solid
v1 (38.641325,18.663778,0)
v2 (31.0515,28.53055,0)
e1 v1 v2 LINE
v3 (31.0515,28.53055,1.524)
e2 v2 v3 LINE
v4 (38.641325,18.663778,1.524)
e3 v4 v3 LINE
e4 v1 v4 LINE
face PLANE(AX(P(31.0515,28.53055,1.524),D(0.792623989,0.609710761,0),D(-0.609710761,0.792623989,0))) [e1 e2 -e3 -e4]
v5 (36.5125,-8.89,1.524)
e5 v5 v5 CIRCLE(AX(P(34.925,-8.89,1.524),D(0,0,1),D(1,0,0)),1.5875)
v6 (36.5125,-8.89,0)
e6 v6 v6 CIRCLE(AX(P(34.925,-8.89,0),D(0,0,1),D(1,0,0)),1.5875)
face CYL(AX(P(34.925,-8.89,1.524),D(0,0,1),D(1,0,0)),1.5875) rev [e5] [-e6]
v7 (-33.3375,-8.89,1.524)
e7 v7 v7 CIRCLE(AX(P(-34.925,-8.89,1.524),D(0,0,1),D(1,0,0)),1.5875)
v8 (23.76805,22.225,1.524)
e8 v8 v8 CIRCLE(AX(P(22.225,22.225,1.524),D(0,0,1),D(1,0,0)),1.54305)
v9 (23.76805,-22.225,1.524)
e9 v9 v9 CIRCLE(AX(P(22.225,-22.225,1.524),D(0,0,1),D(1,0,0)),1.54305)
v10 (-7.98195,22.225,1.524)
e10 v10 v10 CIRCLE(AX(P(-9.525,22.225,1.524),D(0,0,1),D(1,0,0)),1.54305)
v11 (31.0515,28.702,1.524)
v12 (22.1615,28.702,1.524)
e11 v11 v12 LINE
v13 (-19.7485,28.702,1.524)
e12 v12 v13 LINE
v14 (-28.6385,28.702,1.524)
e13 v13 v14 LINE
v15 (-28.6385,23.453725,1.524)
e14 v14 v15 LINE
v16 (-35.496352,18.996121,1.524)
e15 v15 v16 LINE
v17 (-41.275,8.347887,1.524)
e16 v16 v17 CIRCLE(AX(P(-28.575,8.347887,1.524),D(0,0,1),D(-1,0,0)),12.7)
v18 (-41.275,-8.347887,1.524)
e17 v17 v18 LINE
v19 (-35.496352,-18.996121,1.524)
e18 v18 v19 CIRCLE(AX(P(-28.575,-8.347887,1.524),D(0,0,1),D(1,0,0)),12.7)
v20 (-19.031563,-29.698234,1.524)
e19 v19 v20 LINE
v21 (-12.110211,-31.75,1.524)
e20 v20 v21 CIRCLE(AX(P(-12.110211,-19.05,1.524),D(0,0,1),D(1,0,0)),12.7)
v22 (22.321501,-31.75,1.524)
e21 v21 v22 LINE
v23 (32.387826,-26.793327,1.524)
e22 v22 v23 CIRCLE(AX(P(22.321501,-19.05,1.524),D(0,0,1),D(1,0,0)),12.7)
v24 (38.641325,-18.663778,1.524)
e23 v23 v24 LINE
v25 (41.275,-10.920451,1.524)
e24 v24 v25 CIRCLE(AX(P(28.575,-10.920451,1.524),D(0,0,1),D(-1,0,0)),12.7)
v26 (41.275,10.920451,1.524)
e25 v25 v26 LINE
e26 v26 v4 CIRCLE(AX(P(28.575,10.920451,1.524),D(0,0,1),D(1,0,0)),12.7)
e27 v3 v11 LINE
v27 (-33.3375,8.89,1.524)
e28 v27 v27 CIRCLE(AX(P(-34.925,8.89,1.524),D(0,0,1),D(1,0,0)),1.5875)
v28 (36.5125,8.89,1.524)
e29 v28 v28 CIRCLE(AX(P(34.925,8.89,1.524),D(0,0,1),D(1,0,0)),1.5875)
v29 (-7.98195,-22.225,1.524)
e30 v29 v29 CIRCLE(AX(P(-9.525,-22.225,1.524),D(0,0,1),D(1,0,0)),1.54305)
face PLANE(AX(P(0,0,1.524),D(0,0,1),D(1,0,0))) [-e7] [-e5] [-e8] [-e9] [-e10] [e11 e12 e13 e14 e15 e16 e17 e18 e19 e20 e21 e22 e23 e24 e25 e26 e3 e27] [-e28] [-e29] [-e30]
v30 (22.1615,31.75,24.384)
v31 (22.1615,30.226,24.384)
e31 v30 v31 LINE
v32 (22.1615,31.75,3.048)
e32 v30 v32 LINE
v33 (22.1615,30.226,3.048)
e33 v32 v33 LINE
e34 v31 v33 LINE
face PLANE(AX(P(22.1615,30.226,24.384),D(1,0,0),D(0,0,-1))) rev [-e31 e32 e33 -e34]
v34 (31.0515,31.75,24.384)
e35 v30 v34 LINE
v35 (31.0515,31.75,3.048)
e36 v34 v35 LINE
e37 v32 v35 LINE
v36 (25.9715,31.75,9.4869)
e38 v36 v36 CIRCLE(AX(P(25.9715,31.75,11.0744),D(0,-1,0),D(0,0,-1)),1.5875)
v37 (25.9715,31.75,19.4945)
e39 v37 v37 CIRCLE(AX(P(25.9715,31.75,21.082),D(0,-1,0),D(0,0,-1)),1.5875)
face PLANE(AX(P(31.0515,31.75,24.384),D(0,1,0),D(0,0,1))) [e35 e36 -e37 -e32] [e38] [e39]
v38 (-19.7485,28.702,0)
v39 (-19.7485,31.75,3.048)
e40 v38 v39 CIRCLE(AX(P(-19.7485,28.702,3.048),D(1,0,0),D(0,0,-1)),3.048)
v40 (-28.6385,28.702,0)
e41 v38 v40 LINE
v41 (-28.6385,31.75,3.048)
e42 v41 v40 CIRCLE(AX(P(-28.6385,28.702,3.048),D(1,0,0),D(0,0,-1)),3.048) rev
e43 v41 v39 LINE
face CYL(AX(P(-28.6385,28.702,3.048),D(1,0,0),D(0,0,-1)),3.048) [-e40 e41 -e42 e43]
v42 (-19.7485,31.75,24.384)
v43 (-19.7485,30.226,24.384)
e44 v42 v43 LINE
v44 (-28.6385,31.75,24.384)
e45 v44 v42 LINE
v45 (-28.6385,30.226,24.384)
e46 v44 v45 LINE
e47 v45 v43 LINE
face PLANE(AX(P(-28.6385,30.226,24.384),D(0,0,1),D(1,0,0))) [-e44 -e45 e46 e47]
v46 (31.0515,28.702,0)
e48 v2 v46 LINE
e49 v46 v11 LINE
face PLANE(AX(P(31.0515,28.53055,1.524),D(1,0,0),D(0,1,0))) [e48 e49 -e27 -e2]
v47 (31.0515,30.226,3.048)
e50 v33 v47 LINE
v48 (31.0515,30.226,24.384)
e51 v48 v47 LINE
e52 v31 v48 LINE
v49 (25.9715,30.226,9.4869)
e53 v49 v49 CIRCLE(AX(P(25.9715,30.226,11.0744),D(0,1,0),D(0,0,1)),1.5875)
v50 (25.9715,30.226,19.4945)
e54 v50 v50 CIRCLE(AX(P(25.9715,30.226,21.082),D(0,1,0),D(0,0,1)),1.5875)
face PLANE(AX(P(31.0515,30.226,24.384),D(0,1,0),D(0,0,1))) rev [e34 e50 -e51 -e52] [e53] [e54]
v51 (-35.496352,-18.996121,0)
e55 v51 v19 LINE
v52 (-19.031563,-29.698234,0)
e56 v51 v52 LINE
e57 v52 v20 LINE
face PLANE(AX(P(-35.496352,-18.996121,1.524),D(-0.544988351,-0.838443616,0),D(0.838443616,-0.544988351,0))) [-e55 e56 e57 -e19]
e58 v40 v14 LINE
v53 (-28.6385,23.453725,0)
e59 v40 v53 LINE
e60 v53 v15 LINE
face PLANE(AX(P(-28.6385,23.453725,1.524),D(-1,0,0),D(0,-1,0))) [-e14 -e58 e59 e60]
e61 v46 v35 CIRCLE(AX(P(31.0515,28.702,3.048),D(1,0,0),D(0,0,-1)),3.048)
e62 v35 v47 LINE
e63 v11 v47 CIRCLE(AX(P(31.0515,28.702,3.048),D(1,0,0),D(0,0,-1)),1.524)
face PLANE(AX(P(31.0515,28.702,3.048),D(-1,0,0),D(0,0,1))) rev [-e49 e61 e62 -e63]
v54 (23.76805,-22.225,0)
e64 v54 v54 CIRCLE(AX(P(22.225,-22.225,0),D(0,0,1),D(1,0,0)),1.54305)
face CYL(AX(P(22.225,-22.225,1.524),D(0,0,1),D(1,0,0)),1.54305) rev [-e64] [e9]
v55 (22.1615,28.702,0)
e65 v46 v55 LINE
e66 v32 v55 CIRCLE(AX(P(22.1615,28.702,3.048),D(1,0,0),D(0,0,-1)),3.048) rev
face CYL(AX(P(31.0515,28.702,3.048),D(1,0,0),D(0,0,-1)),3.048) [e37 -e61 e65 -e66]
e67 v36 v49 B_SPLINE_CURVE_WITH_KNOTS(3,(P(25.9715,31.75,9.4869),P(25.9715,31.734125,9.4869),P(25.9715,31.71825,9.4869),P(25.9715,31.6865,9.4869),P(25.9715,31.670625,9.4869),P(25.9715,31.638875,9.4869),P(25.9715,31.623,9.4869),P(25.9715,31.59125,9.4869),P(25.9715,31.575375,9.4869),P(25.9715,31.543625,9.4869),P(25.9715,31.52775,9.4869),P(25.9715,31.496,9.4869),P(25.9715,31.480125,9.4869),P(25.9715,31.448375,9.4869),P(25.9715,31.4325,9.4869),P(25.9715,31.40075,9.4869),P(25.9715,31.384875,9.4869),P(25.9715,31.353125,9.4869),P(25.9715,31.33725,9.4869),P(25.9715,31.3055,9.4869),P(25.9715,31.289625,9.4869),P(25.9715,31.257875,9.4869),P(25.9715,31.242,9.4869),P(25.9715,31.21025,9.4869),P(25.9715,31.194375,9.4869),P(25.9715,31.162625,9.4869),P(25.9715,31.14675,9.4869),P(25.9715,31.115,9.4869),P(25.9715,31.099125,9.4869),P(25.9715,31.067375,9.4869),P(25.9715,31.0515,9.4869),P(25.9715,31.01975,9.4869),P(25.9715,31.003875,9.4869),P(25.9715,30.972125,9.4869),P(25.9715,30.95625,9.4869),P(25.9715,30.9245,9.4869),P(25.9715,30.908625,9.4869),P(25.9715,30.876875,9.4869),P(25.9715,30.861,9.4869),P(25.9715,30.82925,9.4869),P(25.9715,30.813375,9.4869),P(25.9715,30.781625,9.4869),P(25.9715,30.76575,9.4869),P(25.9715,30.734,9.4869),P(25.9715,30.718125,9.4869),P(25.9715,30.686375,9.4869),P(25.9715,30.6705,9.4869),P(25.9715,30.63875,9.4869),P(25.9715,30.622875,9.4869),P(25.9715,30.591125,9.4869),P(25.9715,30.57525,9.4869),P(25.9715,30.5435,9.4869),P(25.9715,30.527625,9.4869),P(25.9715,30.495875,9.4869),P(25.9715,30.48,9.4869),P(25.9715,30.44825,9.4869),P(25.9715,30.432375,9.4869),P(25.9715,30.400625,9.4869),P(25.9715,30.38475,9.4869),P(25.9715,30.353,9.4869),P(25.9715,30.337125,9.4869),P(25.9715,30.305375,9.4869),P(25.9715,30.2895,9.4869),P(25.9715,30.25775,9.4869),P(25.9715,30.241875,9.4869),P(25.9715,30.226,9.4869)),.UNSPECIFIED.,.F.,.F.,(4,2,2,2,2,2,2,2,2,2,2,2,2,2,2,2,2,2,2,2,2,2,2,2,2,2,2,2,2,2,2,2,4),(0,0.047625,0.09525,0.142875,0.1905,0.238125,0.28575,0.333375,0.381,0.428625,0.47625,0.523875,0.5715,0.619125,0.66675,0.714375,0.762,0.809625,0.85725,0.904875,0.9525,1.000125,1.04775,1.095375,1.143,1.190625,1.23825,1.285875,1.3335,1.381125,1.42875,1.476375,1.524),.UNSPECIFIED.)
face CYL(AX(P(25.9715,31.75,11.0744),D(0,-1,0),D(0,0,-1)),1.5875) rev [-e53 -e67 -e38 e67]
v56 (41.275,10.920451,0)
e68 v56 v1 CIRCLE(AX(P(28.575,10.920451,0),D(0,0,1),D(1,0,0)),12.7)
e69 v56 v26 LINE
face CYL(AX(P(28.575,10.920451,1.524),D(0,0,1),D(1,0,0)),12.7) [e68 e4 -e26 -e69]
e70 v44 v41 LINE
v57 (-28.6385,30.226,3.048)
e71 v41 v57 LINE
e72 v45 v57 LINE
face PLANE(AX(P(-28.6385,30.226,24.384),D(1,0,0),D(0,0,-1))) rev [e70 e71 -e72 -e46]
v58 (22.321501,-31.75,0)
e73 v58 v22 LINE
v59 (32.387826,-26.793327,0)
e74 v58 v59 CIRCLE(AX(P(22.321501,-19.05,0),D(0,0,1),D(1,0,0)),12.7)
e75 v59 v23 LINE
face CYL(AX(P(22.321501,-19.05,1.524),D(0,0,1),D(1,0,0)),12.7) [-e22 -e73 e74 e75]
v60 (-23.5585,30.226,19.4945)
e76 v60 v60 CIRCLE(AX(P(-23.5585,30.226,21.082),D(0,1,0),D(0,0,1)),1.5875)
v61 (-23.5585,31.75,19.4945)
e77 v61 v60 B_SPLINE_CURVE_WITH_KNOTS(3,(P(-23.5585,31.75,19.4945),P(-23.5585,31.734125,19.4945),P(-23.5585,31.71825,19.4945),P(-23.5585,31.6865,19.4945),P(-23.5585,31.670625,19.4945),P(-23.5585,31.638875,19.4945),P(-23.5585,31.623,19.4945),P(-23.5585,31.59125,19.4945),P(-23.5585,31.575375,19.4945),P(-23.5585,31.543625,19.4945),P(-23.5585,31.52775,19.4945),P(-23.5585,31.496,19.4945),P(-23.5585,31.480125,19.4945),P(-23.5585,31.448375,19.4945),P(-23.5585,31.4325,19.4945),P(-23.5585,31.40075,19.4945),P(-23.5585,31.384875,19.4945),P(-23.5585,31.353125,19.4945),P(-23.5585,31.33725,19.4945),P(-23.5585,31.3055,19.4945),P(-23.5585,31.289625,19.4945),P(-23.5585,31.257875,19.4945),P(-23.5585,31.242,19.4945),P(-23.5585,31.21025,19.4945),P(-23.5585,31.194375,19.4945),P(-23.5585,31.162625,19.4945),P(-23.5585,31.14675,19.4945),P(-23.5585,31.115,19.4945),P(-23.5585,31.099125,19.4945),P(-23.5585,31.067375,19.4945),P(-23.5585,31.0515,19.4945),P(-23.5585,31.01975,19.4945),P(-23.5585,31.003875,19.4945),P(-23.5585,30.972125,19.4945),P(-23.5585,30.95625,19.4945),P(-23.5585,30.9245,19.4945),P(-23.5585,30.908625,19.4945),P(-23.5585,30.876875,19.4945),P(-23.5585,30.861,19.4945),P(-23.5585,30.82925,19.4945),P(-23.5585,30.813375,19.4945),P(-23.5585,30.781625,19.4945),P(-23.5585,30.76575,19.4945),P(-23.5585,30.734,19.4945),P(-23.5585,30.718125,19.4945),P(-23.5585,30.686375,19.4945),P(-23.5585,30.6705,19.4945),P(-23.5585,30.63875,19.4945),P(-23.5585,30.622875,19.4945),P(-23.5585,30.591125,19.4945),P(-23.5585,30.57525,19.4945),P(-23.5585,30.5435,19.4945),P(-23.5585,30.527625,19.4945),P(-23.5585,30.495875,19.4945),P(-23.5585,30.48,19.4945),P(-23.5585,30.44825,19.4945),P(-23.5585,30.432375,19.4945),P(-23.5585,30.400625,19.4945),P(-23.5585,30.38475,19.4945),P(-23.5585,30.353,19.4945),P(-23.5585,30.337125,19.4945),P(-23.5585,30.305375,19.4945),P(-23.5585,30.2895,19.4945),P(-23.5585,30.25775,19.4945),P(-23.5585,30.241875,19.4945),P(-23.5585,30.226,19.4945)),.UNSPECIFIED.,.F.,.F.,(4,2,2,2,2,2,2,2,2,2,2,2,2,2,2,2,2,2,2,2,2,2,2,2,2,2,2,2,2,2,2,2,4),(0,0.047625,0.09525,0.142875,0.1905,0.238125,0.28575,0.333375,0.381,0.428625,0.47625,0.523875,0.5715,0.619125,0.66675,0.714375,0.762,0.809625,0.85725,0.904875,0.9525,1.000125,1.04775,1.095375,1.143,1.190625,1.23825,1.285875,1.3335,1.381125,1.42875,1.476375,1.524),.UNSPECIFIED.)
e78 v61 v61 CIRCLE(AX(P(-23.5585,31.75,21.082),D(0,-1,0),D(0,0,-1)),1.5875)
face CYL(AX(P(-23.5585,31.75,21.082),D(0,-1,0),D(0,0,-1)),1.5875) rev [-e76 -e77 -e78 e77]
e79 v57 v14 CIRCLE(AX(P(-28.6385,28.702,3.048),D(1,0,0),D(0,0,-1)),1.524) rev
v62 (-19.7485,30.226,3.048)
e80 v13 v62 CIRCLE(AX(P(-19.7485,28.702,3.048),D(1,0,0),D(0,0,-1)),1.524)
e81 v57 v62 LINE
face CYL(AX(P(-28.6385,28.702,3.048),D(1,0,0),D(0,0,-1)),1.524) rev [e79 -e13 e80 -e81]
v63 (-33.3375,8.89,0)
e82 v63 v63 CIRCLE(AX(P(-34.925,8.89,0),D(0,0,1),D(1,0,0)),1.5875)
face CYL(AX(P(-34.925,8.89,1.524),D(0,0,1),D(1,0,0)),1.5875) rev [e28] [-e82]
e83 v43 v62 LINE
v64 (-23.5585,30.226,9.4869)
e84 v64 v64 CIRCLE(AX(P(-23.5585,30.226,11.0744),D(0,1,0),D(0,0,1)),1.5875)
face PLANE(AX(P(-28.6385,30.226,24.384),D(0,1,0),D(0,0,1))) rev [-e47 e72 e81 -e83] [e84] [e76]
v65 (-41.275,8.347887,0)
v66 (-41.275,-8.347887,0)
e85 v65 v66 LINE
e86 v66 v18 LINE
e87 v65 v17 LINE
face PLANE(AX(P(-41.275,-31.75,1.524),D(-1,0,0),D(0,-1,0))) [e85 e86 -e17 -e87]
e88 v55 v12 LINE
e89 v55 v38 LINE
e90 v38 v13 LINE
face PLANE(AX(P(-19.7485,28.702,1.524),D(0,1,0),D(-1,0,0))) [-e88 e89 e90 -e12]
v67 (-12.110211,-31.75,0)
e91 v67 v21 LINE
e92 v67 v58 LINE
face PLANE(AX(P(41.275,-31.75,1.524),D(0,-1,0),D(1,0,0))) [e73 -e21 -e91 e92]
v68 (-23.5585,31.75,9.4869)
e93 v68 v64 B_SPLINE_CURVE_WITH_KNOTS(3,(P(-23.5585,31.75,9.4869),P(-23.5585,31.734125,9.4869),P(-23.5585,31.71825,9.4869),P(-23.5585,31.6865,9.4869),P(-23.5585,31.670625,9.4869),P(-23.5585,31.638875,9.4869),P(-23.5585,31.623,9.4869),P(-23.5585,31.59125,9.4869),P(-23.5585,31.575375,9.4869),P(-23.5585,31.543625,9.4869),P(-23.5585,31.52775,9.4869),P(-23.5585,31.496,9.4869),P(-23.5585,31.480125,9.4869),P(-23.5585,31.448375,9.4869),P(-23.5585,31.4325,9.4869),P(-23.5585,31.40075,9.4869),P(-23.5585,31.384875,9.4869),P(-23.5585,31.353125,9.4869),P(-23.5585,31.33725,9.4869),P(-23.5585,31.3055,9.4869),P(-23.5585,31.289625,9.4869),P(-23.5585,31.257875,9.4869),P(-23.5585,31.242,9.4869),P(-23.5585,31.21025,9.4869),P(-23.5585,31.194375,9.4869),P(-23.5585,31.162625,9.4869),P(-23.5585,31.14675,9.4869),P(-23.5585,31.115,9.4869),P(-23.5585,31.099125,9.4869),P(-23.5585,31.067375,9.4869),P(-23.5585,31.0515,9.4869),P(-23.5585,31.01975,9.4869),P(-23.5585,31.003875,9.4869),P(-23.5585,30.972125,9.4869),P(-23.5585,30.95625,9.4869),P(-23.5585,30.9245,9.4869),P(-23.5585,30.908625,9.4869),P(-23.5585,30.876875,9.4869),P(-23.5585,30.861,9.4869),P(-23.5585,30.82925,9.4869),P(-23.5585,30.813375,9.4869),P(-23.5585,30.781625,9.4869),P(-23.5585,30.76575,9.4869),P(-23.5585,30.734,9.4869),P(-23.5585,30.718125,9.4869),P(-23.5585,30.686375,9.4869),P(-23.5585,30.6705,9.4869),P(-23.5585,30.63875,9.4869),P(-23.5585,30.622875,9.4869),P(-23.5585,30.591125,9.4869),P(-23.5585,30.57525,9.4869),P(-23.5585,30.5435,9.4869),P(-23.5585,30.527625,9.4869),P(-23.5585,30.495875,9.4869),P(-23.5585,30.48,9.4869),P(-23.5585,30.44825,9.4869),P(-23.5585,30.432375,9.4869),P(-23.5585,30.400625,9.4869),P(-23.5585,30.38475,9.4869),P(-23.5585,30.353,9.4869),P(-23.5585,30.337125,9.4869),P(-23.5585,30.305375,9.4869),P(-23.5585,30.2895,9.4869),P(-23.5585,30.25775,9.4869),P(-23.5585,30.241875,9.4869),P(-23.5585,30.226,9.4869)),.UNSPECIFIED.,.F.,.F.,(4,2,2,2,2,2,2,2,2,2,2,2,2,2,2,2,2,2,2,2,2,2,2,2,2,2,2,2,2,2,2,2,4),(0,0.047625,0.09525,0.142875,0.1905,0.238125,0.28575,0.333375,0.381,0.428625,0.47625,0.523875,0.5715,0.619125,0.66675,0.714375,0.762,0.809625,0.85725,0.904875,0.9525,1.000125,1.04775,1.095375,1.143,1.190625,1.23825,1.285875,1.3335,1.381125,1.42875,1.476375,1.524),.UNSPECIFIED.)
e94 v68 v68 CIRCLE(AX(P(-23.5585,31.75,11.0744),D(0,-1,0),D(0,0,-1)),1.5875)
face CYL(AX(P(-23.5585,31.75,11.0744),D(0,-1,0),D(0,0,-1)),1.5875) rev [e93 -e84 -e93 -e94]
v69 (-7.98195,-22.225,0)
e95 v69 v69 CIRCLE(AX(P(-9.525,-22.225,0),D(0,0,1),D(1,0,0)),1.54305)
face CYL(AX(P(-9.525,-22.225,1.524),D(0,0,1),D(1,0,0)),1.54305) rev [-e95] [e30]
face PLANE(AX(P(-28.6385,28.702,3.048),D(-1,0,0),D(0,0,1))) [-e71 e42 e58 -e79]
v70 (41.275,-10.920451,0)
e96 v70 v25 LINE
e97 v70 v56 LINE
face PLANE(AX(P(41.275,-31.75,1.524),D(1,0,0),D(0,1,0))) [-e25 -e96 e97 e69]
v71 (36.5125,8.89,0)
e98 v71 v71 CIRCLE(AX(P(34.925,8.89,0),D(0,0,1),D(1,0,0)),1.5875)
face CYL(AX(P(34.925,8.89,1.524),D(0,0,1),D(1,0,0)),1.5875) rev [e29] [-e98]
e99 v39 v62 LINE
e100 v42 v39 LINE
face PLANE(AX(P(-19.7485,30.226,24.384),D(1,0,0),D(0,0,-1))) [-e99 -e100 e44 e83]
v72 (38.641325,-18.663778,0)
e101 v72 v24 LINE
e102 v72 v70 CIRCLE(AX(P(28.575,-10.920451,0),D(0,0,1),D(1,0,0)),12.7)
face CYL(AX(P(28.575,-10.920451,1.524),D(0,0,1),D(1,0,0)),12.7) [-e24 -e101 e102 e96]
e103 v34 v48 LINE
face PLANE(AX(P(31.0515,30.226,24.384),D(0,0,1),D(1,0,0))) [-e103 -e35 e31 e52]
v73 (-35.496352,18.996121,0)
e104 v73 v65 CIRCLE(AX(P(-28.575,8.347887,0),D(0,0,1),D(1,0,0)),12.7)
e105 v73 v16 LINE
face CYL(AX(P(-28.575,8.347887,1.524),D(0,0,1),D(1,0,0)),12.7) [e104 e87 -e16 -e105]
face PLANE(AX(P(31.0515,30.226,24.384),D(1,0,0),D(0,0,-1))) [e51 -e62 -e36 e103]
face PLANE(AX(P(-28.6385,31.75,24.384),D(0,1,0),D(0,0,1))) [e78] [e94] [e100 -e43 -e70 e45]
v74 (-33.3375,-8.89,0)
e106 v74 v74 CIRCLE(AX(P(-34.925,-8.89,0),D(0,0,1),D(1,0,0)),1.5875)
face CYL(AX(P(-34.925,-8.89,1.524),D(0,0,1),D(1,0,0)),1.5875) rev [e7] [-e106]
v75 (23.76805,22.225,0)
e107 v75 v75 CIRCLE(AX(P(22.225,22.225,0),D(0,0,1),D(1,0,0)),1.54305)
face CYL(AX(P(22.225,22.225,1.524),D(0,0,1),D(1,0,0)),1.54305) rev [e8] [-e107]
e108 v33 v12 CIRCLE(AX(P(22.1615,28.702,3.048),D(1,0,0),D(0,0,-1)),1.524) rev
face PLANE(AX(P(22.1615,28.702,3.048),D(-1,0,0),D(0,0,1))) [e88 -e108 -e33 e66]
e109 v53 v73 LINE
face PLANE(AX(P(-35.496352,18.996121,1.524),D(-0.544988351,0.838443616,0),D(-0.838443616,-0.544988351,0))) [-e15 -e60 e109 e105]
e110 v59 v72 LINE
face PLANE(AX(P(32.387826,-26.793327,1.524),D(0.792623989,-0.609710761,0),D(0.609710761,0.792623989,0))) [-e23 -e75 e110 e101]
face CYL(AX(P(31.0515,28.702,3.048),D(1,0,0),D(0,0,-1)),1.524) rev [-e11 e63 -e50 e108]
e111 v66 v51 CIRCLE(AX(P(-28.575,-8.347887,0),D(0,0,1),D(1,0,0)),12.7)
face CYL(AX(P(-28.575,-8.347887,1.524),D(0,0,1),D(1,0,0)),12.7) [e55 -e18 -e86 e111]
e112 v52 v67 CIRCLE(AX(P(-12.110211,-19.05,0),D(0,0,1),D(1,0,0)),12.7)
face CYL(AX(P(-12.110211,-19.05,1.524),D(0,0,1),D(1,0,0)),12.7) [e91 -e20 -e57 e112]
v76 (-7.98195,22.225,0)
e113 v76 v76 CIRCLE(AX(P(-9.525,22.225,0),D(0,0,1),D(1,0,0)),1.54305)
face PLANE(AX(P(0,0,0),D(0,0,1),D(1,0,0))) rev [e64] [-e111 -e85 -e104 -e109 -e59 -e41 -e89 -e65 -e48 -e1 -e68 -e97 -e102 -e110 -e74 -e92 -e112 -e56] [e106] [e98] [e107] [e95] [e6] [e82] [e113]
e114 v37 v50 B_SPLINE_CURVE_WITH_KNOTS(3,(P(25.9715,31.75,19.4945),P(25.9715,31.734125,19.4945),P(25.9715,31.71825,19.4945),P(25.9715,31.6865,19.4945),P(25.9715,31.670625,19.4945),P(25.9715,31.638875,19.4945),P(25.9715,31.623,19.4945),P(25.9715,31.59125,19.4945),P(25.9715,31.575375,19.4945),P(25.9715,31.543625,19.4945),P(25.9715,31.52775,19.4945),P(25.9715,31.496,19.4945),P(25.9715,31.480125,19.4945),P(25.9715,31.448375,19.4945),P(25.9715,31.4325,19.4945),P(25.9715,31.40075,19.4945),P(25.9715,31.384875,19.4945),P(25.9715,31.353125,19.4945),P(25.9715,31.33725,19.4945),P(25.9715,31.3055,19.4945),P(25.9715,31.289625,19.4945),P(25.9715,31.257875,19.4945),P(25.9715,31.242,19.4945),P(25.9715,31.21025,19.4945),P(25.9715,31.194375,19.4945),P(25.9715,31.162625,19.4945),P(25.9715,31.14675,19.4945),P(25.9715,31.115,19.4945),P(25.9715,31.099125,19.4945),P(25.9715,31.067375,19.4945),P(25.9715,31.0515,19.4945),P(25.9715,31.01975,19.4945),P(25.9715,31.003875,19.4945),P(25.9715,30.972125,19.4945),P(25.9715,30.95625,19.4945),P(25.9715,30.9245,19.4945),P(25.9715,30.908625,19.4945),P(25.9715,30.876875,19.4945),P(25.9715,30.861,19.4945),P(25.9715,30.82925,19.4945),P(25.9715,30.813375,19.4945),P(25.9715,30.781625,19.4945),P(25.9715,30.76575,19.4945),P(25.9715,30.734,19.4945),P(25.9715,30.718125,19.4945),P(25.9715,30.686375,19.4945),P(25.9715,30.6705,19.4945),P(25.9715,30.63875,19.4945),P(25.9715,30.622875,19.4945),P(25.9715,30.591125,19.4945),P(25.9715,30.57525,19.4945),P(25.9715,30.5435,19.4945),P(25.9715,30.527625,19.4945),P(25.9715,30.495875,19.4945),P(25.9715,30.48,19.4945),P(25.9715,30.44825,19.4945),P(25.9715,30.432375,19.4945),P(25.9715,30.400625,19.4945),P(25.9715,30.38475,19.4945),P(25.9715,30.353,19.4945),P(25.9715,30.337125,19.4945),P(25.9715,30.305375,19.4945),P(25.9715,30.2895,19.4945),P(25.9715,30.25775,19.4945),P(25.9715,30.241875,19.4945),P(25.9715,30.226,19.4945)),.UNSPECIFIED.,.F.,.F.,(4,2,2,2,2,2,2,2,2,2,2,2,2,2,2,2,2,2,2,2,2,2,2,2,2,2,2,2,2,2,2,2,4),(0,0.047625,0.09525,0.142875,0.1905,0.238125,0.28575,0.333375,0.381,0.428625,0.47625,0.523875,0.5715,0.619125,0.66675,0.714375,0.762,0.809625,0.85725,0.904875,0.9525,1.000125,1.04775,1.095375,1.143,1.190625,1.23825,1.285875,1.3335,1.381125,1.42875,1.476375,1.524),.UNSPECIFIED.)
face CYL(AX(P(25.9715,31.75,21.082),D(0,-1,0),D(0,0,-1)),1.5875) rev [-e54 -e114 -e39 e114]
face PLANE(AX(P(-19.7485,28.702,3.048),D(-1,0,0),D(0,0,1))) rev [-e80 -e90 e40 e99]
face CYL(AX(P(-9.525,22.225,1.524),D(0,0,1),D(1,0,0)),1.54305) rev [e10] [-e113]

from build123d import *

# Parameters (mm, degrees)
SKETCH1_W               = 82.55
SKETCH1_H               = 63.5
BOSS_EXTRUDE1_DEPTH     = 1.524
SKETCH2_OUTSIDE_W       = 105.382
SKETCH2_OUTSIDE_H       = 86.332
SKETCH2_OUTSIDE_R       = 1.54305
SKETCH2_OUTSIDE_R_2     = 1.5875
CUT_EXTRUDE1_DEPTH      = 53.096167815
SKETCH3_W               = 8.89
SKETCH3_H               = 1.524
BOSS_EXTRUDE2_DEPTH     = 22.86
CONVERT_SOLID2_START    = -28.6385
CONVERT_SOLID2_DEPTH    = 59.69
CONVERT_SOLID2_2_DEPTH  = 8.89
CONVERT_SOLID2_START_2  = 22.1615
CONVERT_SOLID2_3_DEPTH  = 8.89
CUT_EXTRUDE2_DEPTH      = 79.353236417
CUT_EXTRUDE2_DEPTH_BACK = 79.353236417
SKETCH12_R              = 1.5875


# Read off the part's stored shape, not the designer's step: Convert-Solid2
with BuildPart() as part:
    # Sketch1 → Boss-Extrude1 (new body)
    with BuildSketch(Plane.XY):
        Rectangle(SKETCH1_W, SKETCH1_H)
    extrude(amount=BOSS_EXTRUDE1_DEPTH)

    # Sketch2 outside → Cut-Extrude1 (cut, through all)
    # profile 1 of 9: a face of its own
    with BuildSketch(Plane.XY.offset(1.524)):
        Rectangle(SKETCH2_OUTSIDE_W, SKETCH2_OUTSIDE_H)
        with BuildLine():
            Line((-41.275, 8.347887239), (-41.275, -8.347887239))
            ThreePointArc((-41.275, -8.347887239), (-39.737239271, -14.405478713), (-35.496352053, -18.996121166))
            Line((-35.496352053, -18.996121166), (-19.031563189, -29.698233927))
            ThreePointArc((-19.031563189, -29.698233927), (-15.719742209, -31.22625909), (-12.110211137, -31.75))
            Line((-12.110211137, -31.75), (22.321500982, -31.75))
            ThreePointArc((22.321500982, -31.75), (27.931748365, -30.443644031), (32.387825644, -26.793326663))
            Line((32.387825644, -26.793326663), (38.641324662, -18.66377794))
            ThreePointArc((38.641324662, -18.66377794), (40.598566925, -15.009930266), (41.275, -10.920451277))
            Line((41.275, -10.920451277), (41.275, 10.920451277))
            ThreePointArc((41.275, 10.920451277), (40.598566925, 15.009930266), (38.641324662, 18.66377794))
            Line((38.641324662, 18.66377794), (31.0515, 28.53055))
            Line((31.0515, 28.53055), (31.0515, 31.75))
            Line((31.0515, 31.75), (22.1615, 31.75))
            Line((22.1615, 31.75), (22.1615, 28.702))
            Line((22.1615, 28.702), (-19.7485, 28.702))
            Line((-19.7485, 28.702), (-19.7485, 31.75))
            Line((-19.7485, 31.75), (-28.6385, 31.75))
            Line((-28.6385, 31.75), (-28.6385, 23.453725))
            Line((-28.6385, 23.453725), (-35.496352053, 18.996121166))
            ThreePointArc((-35.496352053, 18.996121166), (-39.737239271, 14.405478713), (-41.275, 8.347887239))
        make_face(mode=Mode.SUBTRACT)
    # profile 2 of 9: a face of its own
    with BuildSketch(Plane.XY.offset(1.524)):
        with Locations((-9.525, 22.225)):
            Circle(SKETCH2_OUTSIDE_R)
    # profile 3 of 9: a face of its own
    with BuildSketch(Plane.XY.offset(1.524)):
        with Locations((22.225, 22.225)):
            Circle(SKETCH2_OUTSIDE_R)
    # profile 4 of 9: a face of its own
    with BuildSketch(Plane.XY.offset(1.524)):
        with Locations((22.225, -22.225)):
            Circle(SKETCH2_OUTSIDE_R)
    # profile 5 of 9: a face of its own
    with BuildSketch(Plane.XY.offset(1.524)):
        with Locations((-9.525, -22.225)):
            Circle(SKETCH2_OUTSIDE_R)
    # profile 6 of 9: a face of its own
    with BuildSketch(Plane.XY.offset(1.524)):
        with Locations((34.925, -8.89)):
            Circle(SKETCH2_OUTSIDE_R_2)
    # profile 7 of 9: a face of its own
    with BuildSketch(Plane.XY.offset(1.524)):
        with Locations((34.925, 8.89)):
            Circle(SKETCH2_OUTSIDE_R_2)
    # profile 8 of 9: a face of its own
    with BuildSketch(Plane.XY.offset(1.524)):
        with Locations((-34.925, -8.89)):
            Circle(SKETCH2_OUTSIDE_R_2)
    # profile 9 of 9: a face of its own
    with BuildSketch(Plane.XY.offset(1.524)):
        with Locations((-34.925, 8.89)):
            Circle(SKETCH2_OUTSIDE_R_2)
    extrude(amount=-CUT_EXTRUDE1_DEPTH, mode=Mode.SUBTRACT)

    # Sketch3 → Boss-Extrude2 (add)
    with BuildSketch(Plane.XY.offset(1.524)):
        with Locations((-24.1935, 30.988)):
            Rectangle(SKETCH3_W, SKETCH3_H)
        with Locations((26.6065, 30.988)):
            Rectangle(SKETCH3_W, SKETCH3_H)
    extrude(amount=BOSS_EXTRUDE2_DEPTH)

    # Convert-Solid2 outline → Convert-Solid2 (cut)
    with BuildSketch(Plane.YZ.offset(CONVERT_SOLID2_START)):
        with BuildLine():
            ThreePointArc((31.75, 3.048), (30.857261469, 0.892738531), (28.702, 0))
            Line((28.702, 0), (31.75, 0))
            Line((31.75, 0), (31.75, 3.048))
        make_face()
    extrude(amount=CONVERT_SOLID2_DEPTH, mode=Mode.SUBTRACT)

    # Convert-Solid2 2 outline → Convert-Solid2 2 (add)
    with BuildSketch(Plane.YZ.offset(CONVERT_SOLID2_START)):
        with BuildLine():
            ThreePointArc((30.226, 3.048), (29.779630735, 1.970369265), (28.702, 1.524))
            Line((28.702, 1.524), (30.226, 1.524))
            Line((30.226, 1.524), (30.226, 3.048))
        make_face()
    extrude(amount=CONVERT_SOLID2_2_DEPTH)

    # Convert-Solid2 3 outline → Convert-Solid2 3 (add)
    with BuildSketch(Plane.YZ.offset(CONVERT_SOLID2_START_2)):
        with BuildLine():
            ThreePointArc((30.226, 3.048), (29.779630735, 1.970369265), (28.702, 1.524))
            Line((28.702, 1.524), (30.226, 1.524))
            Line((30.226, 1.524), (30.226, 3.048))
        make_face()
    extrude(amount=CONVERT_SOLID2_3_DEPTH)

    # Sketch12 → Cut-Extrude2 (cut, two sides: drawn at the far end of the back side and taken through both)
    with BuildSketch(Plane.XZ.offset(-30.226).offset(-CUT_EXTRUDE2_DEPTH_BACK)):
        with Locations(Location((-23.5585, 21.082, 0), (0, 0, 270))):
            Circle(SKETCH12_R)
        with Locations(Location((-23.5585, 11.0744, 0), (0, 0, 270))):
            Circle(SKETCH12_R)
        with Locations(Location((25.9715, 21.082, 0), (0, 0, 270))):
            Circle(SKETCH12_R)
        with Locations(Location((25.9715, 11.0744, 0), (0, 0, 270))):
            Circle(SKETCH12_R)
    extrude(amount=CUT_EXTRUDE2_DEPTH + CUT_EXTRUDE2_DEPTH_BACK, mode=Mode.SUBTRACT)


solid = part.part
